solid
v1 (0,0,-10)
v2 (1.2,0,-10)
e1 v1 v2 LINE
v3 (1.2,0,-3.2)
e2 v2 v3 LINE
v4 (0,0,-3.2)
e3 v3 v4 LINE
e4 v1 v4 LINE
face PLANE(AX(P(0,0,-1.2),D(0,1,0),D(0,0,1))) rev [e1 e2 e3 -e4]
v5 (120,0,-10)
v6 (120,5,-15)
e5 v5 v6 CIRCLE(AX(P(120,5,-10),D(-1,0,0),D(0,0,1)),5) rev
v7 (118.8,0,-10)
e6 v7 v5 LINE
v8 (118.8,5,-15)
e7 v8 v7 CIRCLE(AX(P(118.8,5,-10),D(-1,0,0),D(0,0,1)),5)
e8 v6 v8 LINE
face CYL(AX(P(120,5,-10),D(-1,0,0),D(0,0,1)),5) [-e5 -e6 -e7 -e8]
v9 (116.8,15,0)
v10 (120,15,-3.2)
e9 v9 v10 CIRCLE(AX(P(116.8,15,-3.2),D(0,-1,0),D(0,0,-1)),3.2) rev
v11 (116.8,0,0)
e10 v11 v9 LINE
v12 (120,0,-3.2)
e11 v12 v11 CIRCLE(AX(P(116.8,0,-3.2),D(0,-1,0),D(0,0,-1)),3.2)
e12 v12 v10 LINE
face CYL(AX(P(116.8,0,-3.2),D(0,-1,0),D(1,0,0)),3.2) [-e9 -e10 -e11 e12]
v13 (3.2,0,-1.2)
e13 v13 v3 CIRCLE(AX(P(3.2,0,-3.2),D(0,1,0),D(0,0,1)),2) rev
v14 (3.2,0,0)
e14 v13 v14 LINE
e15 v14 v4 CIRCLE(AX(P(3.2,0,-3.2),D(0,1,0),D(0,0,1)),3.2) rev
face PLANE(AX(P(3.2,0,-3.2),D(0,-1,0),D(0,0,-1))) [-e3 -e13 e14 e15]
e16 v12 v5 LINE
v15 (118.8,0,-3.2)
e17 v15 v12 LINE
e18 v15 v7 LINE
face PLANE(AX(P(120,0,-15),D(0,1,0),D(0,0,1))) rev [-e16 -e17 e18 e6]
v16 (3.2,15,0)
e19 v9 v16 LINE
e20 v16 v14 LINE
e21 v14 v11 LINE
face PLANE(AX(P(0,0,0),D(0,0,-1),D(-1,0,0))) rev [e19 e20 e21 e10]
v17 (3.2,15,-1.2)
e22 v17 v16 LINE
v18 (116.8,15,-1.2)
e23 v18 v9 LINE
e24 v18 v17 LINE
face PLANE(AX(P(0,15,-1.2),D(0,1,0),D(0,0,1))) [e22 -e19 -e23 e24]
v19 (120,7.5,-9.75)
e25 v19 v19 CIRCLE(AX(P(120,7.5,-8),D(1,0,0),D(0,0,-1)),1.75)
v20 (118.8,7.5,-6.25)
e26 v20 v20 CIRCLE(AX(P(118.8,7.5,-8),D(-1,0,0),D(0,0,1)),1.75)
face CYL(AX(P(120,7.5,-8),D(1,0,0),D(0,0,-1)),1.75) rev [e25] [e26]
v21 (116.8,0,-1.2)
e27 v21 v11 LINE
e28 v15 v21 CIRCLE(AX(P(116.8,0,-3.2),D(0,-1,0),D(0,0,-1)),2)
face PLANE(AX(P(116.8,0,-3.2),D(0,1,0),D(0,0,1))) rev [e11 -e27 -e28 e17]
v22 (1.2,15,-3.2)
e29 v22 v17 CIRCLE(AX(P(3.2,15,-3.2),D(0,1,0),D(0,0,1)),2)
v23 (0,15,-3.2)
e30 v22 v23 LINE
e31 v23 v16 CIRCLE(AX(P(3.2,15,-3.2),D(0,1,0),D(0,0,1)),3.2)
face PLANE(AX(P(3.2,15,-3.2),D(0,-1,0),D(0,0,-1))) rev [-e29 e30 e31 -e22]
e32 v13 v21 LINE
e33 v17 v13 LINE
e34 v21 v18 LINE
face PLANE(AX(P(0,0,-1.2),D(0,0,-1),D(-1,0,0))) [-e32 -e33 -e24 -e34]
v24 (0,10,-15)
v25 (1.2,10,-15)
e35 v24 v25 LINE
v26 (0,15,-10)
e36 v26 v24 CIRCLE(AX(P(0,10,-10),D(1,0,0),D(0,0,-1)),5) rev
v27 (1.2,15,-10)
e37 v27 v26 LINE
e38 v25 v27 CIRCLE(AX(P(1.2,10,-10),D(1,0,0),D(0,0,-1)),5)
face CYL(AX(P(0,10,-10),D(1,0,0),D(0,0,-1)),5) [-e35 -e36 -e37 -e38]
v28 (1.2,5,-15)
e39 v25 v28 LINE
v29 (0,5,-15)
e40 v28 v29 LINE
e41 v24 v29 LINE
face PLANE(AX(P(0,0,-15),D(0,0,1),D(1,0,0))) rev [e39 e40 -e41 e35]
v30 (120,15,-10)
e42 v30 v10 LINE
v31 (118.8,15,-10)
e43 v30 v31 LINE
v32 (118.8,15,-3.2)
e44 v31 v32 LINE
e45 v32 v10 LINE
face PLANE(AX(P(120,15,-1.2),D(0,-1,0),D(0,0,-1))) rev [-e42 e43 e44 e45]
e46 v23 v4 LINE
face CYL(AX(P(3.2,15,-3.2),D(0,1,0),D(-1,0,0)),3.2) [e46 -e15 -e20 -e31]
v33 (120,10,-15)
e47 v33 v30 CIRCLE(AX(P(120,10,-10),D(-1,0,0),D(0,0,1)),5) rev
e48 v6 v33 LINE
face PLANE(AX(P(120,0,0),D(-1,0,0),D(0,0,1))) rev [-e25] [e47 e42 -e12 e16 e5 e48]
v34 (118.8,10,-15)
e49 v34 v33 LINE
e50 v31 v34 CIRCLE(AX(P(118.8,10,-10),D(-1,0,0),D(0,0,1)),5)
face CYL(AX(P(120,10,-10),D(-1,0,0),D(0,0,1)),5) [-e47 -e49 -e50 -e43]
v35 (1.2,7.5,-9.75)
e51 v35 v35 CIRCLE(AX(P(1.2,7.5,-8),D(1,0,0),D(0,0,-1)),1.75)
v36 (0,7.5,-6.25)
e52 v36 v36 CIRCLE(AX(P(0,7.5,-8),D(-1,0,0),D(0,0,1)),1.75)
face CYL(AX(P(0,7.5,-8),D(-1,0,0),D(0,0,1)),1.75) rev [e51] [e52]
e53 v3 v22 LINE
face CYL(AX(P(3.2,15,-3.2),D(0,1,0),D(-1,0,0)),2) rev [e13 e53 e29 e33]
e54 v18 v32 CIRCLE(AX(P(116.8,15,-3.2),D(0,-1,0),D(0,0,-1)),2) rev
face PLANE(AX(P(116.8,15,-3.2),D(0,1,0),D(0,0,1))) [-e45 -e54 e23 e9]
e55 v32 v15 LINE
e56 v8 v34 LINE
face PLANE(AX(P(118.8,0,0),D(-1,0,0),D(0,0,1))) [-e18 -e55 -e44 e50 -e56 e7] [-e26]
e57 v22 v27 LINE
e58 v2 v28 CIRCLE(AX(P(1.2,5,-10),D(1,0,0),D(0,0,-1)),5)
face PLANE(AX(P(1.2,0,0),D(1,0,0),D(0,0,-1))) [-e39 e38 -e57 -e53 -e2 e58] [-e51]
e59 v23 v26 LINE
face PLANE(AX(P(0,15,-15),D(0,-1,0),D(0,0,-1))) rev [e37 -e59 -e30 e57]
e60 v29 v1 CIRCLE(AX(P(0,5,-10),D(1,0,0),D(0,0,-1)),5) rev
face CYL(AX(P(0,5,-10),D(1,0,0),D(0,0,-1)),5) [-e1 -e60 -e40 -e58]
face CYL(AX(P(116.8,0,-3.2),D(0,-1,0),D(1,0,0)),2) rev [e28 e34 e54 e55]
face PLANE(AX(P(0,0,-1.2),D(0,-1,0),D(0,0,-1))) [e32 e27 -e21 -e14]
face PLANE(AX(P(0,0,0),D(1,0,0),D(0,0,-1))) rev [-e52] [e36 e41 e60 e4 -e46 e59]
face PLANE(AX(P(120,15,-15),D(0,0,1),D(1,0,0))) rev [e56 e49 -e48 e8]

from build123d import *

# Parameters (mm, degrees)
ESBO_O1_W                        = 120
ESBO_O1_H                        = 15
FLANGE_BASE1_DEPTH               = 1.2
ARESTA_FLANGE1_STRIP_W           = 8.8
ARESTA_FLANGE1_STRIP_H           = 1.2
ARESTA_FLANGE1_STRIP_CUT_DEPTH   = 15
ARESTA_FLANGE1_STRIP_2_W         = 8.8
ARESTA_FLANGE1_STRIP_2_H         = 1.2
ARESTA_FLANGE1_STRIP_CUT_2_DEPTH = 15
ARESTA_FLANGE1_DEPTH             = 15
ARESTA_FLANGE1_BEND_DEPTH        = 15
QUEBRA_CANTO1_DEPTH              = 120
FURO_DE_DI_METRO_3_5_3_5_1_D     = 3.5
FURO_DE_DI_METRO_3_5_3_5_1_DEPTH = 1.2
FURO_DE_DI_METRO_3_5_3_5_2_D     = 3.5


# Read off the part's stored shape, not the designer's step: Quebra-Canto1
# Sheet-metal steps are written as plain solids
with BuildPart() as part:
    # Esboço1 → Flange-base1 (new body)
    with BuildSketch(Plane.XY):
        with Locations((60, 7.5)):
            Rectangle(ESBO_O1_W, ESBO_O1_H)
    extrude(amount=-FLANGE_BASE1_DEPTH)

    # Aresta-Flange1 strip (across the edge) → Aresta-Flange1 strip cut (cut)
    with BuildSketch(Plane(origin=(120, 15, -1.2), x_dir=(-1, 0, 0), z_dir=(0, -1, 0))):
        with Locations((-1.2, -0.6)):
            Rectangle(ARESTA_FLANGE1_STRIP_W, ARESTA_FLANGE1_STRIP_H)
    extrude(amount=ARESTA_FLANGE1_STRIP_CUT_DEPTH, mode=Mode.SUBTRACT)

    # Aresta-Flange1 strip 2 (across the edge) → Aresta-Flange1 strip cut 2 (cut)
    with BuildSketch(Plane(origin=(0, 0, -1.2), x_dir=(1, 0, 0), z_dir=(0, 1, 0))):
        with Locations((-1.2, -0.6)):
            Rectangle(ARESTA_FLANGE1_STRIP_2_W, ARESTA_FLANGE1_STRIP_2_H)
    extrude(amount=ARESTA_FLANGE1_STRIP_CUT_2_DEPTH, mode=Mode.SUBTRACT)

    # Aresta-Flange1 section (across the edge) → Aresta-Flange1 (add)
    with BuildSketch(Plane(origin=(120, 15, -1.2), x_dir=(-1, 0, 0), z_dir=(0, -1, 0))):
        with BuildLine():
            Line((0, 2), (0, 13.8))
            Line((0, 13.8), (1.2, 13.8))
            Line((1.2, 13.8), (1.2, 2))
            ThreePointArc((1.2, 2), (1.785786438, 0.585786438), (3.2, 0))
            Line((3.2, 0), (3.2, -1.2))
            ThreePointArc((3.2, -1.2), (0.9372583, -0.2627417), (0, 2))
        make_face()
    extrude(amount=ARESTA_FLANGE1_DEPTH)

    # Aresta-Flange1 section 2 (across the edge) → Aresta-Flange1 bend (add)
    with BuildSketch(Plane(origin=(0, 0, -1.2), x_dir=(1, 0, 0), z_dir=(0, 1, 0))):
        with BuildLine():
            Line((0, 2), (0, 13.8))
            Line((0, 13.8), (1.2, 13.8))
            Line((1.2, 13.8), (1.2, 2))
            ThreePointArc((1.2, 2), (1.785786438, 0.585786438), (3.2, 0))
            Line((3.2, 0), (3.2, -1.2))
            ThreePointArc((3.2, -1.2), (0.9372583, -0.2627417), (0, 2))
        make_face()
    extrude(amount=ARESTA_FLANGE1_BEND_DEPTH)

    # Quebra-Canto1 outline → Quebra-Canto1 (cut)
    with BuildSketch(Plane.YZ):
        with BuildLine():
            Line((15, -15), (15, -10))
            ThreePointArc((15, -10), (13.535533906, -13.535533906), (10, -15))
            Line((10, -15), (15, -15))
        make_face()
        with BuildLine():
            Line((0, -15), (5, -15))
            ThreePointArc((5, -15), (1.464466094, -13.535533906), (0, -10))
            Line((0, -10), (0, -15))
        make_face()
    extrude(amount=QUEBRA_CANTO1_DEPTH, mode=Mode.SUBTRACT)

    # Furo de diâmetro Ø3.5 (3.5)1
    with Locations(Plane(origin=(120, 0, 0), x_dir=(0, 0, -1), z_dir=(1, 0, 0))):
        with Locations((8, 7.5)):
            Hole(FURO_DE_DI_METRO_3_5_3_5_1_D / 2, depth=FURO_DE_DI_METRO_3_5_3_5_1_DEPTH)

    # Furo de diâmetro Ø3.5 (3.5)2 (through all)
    with Locations(Plane.ZY):
        with Locations((-8, 7.5)):
            Hole(FURO_DE_DI_METRO_3_5_3_5_2_D / 2)


solid = part.part
